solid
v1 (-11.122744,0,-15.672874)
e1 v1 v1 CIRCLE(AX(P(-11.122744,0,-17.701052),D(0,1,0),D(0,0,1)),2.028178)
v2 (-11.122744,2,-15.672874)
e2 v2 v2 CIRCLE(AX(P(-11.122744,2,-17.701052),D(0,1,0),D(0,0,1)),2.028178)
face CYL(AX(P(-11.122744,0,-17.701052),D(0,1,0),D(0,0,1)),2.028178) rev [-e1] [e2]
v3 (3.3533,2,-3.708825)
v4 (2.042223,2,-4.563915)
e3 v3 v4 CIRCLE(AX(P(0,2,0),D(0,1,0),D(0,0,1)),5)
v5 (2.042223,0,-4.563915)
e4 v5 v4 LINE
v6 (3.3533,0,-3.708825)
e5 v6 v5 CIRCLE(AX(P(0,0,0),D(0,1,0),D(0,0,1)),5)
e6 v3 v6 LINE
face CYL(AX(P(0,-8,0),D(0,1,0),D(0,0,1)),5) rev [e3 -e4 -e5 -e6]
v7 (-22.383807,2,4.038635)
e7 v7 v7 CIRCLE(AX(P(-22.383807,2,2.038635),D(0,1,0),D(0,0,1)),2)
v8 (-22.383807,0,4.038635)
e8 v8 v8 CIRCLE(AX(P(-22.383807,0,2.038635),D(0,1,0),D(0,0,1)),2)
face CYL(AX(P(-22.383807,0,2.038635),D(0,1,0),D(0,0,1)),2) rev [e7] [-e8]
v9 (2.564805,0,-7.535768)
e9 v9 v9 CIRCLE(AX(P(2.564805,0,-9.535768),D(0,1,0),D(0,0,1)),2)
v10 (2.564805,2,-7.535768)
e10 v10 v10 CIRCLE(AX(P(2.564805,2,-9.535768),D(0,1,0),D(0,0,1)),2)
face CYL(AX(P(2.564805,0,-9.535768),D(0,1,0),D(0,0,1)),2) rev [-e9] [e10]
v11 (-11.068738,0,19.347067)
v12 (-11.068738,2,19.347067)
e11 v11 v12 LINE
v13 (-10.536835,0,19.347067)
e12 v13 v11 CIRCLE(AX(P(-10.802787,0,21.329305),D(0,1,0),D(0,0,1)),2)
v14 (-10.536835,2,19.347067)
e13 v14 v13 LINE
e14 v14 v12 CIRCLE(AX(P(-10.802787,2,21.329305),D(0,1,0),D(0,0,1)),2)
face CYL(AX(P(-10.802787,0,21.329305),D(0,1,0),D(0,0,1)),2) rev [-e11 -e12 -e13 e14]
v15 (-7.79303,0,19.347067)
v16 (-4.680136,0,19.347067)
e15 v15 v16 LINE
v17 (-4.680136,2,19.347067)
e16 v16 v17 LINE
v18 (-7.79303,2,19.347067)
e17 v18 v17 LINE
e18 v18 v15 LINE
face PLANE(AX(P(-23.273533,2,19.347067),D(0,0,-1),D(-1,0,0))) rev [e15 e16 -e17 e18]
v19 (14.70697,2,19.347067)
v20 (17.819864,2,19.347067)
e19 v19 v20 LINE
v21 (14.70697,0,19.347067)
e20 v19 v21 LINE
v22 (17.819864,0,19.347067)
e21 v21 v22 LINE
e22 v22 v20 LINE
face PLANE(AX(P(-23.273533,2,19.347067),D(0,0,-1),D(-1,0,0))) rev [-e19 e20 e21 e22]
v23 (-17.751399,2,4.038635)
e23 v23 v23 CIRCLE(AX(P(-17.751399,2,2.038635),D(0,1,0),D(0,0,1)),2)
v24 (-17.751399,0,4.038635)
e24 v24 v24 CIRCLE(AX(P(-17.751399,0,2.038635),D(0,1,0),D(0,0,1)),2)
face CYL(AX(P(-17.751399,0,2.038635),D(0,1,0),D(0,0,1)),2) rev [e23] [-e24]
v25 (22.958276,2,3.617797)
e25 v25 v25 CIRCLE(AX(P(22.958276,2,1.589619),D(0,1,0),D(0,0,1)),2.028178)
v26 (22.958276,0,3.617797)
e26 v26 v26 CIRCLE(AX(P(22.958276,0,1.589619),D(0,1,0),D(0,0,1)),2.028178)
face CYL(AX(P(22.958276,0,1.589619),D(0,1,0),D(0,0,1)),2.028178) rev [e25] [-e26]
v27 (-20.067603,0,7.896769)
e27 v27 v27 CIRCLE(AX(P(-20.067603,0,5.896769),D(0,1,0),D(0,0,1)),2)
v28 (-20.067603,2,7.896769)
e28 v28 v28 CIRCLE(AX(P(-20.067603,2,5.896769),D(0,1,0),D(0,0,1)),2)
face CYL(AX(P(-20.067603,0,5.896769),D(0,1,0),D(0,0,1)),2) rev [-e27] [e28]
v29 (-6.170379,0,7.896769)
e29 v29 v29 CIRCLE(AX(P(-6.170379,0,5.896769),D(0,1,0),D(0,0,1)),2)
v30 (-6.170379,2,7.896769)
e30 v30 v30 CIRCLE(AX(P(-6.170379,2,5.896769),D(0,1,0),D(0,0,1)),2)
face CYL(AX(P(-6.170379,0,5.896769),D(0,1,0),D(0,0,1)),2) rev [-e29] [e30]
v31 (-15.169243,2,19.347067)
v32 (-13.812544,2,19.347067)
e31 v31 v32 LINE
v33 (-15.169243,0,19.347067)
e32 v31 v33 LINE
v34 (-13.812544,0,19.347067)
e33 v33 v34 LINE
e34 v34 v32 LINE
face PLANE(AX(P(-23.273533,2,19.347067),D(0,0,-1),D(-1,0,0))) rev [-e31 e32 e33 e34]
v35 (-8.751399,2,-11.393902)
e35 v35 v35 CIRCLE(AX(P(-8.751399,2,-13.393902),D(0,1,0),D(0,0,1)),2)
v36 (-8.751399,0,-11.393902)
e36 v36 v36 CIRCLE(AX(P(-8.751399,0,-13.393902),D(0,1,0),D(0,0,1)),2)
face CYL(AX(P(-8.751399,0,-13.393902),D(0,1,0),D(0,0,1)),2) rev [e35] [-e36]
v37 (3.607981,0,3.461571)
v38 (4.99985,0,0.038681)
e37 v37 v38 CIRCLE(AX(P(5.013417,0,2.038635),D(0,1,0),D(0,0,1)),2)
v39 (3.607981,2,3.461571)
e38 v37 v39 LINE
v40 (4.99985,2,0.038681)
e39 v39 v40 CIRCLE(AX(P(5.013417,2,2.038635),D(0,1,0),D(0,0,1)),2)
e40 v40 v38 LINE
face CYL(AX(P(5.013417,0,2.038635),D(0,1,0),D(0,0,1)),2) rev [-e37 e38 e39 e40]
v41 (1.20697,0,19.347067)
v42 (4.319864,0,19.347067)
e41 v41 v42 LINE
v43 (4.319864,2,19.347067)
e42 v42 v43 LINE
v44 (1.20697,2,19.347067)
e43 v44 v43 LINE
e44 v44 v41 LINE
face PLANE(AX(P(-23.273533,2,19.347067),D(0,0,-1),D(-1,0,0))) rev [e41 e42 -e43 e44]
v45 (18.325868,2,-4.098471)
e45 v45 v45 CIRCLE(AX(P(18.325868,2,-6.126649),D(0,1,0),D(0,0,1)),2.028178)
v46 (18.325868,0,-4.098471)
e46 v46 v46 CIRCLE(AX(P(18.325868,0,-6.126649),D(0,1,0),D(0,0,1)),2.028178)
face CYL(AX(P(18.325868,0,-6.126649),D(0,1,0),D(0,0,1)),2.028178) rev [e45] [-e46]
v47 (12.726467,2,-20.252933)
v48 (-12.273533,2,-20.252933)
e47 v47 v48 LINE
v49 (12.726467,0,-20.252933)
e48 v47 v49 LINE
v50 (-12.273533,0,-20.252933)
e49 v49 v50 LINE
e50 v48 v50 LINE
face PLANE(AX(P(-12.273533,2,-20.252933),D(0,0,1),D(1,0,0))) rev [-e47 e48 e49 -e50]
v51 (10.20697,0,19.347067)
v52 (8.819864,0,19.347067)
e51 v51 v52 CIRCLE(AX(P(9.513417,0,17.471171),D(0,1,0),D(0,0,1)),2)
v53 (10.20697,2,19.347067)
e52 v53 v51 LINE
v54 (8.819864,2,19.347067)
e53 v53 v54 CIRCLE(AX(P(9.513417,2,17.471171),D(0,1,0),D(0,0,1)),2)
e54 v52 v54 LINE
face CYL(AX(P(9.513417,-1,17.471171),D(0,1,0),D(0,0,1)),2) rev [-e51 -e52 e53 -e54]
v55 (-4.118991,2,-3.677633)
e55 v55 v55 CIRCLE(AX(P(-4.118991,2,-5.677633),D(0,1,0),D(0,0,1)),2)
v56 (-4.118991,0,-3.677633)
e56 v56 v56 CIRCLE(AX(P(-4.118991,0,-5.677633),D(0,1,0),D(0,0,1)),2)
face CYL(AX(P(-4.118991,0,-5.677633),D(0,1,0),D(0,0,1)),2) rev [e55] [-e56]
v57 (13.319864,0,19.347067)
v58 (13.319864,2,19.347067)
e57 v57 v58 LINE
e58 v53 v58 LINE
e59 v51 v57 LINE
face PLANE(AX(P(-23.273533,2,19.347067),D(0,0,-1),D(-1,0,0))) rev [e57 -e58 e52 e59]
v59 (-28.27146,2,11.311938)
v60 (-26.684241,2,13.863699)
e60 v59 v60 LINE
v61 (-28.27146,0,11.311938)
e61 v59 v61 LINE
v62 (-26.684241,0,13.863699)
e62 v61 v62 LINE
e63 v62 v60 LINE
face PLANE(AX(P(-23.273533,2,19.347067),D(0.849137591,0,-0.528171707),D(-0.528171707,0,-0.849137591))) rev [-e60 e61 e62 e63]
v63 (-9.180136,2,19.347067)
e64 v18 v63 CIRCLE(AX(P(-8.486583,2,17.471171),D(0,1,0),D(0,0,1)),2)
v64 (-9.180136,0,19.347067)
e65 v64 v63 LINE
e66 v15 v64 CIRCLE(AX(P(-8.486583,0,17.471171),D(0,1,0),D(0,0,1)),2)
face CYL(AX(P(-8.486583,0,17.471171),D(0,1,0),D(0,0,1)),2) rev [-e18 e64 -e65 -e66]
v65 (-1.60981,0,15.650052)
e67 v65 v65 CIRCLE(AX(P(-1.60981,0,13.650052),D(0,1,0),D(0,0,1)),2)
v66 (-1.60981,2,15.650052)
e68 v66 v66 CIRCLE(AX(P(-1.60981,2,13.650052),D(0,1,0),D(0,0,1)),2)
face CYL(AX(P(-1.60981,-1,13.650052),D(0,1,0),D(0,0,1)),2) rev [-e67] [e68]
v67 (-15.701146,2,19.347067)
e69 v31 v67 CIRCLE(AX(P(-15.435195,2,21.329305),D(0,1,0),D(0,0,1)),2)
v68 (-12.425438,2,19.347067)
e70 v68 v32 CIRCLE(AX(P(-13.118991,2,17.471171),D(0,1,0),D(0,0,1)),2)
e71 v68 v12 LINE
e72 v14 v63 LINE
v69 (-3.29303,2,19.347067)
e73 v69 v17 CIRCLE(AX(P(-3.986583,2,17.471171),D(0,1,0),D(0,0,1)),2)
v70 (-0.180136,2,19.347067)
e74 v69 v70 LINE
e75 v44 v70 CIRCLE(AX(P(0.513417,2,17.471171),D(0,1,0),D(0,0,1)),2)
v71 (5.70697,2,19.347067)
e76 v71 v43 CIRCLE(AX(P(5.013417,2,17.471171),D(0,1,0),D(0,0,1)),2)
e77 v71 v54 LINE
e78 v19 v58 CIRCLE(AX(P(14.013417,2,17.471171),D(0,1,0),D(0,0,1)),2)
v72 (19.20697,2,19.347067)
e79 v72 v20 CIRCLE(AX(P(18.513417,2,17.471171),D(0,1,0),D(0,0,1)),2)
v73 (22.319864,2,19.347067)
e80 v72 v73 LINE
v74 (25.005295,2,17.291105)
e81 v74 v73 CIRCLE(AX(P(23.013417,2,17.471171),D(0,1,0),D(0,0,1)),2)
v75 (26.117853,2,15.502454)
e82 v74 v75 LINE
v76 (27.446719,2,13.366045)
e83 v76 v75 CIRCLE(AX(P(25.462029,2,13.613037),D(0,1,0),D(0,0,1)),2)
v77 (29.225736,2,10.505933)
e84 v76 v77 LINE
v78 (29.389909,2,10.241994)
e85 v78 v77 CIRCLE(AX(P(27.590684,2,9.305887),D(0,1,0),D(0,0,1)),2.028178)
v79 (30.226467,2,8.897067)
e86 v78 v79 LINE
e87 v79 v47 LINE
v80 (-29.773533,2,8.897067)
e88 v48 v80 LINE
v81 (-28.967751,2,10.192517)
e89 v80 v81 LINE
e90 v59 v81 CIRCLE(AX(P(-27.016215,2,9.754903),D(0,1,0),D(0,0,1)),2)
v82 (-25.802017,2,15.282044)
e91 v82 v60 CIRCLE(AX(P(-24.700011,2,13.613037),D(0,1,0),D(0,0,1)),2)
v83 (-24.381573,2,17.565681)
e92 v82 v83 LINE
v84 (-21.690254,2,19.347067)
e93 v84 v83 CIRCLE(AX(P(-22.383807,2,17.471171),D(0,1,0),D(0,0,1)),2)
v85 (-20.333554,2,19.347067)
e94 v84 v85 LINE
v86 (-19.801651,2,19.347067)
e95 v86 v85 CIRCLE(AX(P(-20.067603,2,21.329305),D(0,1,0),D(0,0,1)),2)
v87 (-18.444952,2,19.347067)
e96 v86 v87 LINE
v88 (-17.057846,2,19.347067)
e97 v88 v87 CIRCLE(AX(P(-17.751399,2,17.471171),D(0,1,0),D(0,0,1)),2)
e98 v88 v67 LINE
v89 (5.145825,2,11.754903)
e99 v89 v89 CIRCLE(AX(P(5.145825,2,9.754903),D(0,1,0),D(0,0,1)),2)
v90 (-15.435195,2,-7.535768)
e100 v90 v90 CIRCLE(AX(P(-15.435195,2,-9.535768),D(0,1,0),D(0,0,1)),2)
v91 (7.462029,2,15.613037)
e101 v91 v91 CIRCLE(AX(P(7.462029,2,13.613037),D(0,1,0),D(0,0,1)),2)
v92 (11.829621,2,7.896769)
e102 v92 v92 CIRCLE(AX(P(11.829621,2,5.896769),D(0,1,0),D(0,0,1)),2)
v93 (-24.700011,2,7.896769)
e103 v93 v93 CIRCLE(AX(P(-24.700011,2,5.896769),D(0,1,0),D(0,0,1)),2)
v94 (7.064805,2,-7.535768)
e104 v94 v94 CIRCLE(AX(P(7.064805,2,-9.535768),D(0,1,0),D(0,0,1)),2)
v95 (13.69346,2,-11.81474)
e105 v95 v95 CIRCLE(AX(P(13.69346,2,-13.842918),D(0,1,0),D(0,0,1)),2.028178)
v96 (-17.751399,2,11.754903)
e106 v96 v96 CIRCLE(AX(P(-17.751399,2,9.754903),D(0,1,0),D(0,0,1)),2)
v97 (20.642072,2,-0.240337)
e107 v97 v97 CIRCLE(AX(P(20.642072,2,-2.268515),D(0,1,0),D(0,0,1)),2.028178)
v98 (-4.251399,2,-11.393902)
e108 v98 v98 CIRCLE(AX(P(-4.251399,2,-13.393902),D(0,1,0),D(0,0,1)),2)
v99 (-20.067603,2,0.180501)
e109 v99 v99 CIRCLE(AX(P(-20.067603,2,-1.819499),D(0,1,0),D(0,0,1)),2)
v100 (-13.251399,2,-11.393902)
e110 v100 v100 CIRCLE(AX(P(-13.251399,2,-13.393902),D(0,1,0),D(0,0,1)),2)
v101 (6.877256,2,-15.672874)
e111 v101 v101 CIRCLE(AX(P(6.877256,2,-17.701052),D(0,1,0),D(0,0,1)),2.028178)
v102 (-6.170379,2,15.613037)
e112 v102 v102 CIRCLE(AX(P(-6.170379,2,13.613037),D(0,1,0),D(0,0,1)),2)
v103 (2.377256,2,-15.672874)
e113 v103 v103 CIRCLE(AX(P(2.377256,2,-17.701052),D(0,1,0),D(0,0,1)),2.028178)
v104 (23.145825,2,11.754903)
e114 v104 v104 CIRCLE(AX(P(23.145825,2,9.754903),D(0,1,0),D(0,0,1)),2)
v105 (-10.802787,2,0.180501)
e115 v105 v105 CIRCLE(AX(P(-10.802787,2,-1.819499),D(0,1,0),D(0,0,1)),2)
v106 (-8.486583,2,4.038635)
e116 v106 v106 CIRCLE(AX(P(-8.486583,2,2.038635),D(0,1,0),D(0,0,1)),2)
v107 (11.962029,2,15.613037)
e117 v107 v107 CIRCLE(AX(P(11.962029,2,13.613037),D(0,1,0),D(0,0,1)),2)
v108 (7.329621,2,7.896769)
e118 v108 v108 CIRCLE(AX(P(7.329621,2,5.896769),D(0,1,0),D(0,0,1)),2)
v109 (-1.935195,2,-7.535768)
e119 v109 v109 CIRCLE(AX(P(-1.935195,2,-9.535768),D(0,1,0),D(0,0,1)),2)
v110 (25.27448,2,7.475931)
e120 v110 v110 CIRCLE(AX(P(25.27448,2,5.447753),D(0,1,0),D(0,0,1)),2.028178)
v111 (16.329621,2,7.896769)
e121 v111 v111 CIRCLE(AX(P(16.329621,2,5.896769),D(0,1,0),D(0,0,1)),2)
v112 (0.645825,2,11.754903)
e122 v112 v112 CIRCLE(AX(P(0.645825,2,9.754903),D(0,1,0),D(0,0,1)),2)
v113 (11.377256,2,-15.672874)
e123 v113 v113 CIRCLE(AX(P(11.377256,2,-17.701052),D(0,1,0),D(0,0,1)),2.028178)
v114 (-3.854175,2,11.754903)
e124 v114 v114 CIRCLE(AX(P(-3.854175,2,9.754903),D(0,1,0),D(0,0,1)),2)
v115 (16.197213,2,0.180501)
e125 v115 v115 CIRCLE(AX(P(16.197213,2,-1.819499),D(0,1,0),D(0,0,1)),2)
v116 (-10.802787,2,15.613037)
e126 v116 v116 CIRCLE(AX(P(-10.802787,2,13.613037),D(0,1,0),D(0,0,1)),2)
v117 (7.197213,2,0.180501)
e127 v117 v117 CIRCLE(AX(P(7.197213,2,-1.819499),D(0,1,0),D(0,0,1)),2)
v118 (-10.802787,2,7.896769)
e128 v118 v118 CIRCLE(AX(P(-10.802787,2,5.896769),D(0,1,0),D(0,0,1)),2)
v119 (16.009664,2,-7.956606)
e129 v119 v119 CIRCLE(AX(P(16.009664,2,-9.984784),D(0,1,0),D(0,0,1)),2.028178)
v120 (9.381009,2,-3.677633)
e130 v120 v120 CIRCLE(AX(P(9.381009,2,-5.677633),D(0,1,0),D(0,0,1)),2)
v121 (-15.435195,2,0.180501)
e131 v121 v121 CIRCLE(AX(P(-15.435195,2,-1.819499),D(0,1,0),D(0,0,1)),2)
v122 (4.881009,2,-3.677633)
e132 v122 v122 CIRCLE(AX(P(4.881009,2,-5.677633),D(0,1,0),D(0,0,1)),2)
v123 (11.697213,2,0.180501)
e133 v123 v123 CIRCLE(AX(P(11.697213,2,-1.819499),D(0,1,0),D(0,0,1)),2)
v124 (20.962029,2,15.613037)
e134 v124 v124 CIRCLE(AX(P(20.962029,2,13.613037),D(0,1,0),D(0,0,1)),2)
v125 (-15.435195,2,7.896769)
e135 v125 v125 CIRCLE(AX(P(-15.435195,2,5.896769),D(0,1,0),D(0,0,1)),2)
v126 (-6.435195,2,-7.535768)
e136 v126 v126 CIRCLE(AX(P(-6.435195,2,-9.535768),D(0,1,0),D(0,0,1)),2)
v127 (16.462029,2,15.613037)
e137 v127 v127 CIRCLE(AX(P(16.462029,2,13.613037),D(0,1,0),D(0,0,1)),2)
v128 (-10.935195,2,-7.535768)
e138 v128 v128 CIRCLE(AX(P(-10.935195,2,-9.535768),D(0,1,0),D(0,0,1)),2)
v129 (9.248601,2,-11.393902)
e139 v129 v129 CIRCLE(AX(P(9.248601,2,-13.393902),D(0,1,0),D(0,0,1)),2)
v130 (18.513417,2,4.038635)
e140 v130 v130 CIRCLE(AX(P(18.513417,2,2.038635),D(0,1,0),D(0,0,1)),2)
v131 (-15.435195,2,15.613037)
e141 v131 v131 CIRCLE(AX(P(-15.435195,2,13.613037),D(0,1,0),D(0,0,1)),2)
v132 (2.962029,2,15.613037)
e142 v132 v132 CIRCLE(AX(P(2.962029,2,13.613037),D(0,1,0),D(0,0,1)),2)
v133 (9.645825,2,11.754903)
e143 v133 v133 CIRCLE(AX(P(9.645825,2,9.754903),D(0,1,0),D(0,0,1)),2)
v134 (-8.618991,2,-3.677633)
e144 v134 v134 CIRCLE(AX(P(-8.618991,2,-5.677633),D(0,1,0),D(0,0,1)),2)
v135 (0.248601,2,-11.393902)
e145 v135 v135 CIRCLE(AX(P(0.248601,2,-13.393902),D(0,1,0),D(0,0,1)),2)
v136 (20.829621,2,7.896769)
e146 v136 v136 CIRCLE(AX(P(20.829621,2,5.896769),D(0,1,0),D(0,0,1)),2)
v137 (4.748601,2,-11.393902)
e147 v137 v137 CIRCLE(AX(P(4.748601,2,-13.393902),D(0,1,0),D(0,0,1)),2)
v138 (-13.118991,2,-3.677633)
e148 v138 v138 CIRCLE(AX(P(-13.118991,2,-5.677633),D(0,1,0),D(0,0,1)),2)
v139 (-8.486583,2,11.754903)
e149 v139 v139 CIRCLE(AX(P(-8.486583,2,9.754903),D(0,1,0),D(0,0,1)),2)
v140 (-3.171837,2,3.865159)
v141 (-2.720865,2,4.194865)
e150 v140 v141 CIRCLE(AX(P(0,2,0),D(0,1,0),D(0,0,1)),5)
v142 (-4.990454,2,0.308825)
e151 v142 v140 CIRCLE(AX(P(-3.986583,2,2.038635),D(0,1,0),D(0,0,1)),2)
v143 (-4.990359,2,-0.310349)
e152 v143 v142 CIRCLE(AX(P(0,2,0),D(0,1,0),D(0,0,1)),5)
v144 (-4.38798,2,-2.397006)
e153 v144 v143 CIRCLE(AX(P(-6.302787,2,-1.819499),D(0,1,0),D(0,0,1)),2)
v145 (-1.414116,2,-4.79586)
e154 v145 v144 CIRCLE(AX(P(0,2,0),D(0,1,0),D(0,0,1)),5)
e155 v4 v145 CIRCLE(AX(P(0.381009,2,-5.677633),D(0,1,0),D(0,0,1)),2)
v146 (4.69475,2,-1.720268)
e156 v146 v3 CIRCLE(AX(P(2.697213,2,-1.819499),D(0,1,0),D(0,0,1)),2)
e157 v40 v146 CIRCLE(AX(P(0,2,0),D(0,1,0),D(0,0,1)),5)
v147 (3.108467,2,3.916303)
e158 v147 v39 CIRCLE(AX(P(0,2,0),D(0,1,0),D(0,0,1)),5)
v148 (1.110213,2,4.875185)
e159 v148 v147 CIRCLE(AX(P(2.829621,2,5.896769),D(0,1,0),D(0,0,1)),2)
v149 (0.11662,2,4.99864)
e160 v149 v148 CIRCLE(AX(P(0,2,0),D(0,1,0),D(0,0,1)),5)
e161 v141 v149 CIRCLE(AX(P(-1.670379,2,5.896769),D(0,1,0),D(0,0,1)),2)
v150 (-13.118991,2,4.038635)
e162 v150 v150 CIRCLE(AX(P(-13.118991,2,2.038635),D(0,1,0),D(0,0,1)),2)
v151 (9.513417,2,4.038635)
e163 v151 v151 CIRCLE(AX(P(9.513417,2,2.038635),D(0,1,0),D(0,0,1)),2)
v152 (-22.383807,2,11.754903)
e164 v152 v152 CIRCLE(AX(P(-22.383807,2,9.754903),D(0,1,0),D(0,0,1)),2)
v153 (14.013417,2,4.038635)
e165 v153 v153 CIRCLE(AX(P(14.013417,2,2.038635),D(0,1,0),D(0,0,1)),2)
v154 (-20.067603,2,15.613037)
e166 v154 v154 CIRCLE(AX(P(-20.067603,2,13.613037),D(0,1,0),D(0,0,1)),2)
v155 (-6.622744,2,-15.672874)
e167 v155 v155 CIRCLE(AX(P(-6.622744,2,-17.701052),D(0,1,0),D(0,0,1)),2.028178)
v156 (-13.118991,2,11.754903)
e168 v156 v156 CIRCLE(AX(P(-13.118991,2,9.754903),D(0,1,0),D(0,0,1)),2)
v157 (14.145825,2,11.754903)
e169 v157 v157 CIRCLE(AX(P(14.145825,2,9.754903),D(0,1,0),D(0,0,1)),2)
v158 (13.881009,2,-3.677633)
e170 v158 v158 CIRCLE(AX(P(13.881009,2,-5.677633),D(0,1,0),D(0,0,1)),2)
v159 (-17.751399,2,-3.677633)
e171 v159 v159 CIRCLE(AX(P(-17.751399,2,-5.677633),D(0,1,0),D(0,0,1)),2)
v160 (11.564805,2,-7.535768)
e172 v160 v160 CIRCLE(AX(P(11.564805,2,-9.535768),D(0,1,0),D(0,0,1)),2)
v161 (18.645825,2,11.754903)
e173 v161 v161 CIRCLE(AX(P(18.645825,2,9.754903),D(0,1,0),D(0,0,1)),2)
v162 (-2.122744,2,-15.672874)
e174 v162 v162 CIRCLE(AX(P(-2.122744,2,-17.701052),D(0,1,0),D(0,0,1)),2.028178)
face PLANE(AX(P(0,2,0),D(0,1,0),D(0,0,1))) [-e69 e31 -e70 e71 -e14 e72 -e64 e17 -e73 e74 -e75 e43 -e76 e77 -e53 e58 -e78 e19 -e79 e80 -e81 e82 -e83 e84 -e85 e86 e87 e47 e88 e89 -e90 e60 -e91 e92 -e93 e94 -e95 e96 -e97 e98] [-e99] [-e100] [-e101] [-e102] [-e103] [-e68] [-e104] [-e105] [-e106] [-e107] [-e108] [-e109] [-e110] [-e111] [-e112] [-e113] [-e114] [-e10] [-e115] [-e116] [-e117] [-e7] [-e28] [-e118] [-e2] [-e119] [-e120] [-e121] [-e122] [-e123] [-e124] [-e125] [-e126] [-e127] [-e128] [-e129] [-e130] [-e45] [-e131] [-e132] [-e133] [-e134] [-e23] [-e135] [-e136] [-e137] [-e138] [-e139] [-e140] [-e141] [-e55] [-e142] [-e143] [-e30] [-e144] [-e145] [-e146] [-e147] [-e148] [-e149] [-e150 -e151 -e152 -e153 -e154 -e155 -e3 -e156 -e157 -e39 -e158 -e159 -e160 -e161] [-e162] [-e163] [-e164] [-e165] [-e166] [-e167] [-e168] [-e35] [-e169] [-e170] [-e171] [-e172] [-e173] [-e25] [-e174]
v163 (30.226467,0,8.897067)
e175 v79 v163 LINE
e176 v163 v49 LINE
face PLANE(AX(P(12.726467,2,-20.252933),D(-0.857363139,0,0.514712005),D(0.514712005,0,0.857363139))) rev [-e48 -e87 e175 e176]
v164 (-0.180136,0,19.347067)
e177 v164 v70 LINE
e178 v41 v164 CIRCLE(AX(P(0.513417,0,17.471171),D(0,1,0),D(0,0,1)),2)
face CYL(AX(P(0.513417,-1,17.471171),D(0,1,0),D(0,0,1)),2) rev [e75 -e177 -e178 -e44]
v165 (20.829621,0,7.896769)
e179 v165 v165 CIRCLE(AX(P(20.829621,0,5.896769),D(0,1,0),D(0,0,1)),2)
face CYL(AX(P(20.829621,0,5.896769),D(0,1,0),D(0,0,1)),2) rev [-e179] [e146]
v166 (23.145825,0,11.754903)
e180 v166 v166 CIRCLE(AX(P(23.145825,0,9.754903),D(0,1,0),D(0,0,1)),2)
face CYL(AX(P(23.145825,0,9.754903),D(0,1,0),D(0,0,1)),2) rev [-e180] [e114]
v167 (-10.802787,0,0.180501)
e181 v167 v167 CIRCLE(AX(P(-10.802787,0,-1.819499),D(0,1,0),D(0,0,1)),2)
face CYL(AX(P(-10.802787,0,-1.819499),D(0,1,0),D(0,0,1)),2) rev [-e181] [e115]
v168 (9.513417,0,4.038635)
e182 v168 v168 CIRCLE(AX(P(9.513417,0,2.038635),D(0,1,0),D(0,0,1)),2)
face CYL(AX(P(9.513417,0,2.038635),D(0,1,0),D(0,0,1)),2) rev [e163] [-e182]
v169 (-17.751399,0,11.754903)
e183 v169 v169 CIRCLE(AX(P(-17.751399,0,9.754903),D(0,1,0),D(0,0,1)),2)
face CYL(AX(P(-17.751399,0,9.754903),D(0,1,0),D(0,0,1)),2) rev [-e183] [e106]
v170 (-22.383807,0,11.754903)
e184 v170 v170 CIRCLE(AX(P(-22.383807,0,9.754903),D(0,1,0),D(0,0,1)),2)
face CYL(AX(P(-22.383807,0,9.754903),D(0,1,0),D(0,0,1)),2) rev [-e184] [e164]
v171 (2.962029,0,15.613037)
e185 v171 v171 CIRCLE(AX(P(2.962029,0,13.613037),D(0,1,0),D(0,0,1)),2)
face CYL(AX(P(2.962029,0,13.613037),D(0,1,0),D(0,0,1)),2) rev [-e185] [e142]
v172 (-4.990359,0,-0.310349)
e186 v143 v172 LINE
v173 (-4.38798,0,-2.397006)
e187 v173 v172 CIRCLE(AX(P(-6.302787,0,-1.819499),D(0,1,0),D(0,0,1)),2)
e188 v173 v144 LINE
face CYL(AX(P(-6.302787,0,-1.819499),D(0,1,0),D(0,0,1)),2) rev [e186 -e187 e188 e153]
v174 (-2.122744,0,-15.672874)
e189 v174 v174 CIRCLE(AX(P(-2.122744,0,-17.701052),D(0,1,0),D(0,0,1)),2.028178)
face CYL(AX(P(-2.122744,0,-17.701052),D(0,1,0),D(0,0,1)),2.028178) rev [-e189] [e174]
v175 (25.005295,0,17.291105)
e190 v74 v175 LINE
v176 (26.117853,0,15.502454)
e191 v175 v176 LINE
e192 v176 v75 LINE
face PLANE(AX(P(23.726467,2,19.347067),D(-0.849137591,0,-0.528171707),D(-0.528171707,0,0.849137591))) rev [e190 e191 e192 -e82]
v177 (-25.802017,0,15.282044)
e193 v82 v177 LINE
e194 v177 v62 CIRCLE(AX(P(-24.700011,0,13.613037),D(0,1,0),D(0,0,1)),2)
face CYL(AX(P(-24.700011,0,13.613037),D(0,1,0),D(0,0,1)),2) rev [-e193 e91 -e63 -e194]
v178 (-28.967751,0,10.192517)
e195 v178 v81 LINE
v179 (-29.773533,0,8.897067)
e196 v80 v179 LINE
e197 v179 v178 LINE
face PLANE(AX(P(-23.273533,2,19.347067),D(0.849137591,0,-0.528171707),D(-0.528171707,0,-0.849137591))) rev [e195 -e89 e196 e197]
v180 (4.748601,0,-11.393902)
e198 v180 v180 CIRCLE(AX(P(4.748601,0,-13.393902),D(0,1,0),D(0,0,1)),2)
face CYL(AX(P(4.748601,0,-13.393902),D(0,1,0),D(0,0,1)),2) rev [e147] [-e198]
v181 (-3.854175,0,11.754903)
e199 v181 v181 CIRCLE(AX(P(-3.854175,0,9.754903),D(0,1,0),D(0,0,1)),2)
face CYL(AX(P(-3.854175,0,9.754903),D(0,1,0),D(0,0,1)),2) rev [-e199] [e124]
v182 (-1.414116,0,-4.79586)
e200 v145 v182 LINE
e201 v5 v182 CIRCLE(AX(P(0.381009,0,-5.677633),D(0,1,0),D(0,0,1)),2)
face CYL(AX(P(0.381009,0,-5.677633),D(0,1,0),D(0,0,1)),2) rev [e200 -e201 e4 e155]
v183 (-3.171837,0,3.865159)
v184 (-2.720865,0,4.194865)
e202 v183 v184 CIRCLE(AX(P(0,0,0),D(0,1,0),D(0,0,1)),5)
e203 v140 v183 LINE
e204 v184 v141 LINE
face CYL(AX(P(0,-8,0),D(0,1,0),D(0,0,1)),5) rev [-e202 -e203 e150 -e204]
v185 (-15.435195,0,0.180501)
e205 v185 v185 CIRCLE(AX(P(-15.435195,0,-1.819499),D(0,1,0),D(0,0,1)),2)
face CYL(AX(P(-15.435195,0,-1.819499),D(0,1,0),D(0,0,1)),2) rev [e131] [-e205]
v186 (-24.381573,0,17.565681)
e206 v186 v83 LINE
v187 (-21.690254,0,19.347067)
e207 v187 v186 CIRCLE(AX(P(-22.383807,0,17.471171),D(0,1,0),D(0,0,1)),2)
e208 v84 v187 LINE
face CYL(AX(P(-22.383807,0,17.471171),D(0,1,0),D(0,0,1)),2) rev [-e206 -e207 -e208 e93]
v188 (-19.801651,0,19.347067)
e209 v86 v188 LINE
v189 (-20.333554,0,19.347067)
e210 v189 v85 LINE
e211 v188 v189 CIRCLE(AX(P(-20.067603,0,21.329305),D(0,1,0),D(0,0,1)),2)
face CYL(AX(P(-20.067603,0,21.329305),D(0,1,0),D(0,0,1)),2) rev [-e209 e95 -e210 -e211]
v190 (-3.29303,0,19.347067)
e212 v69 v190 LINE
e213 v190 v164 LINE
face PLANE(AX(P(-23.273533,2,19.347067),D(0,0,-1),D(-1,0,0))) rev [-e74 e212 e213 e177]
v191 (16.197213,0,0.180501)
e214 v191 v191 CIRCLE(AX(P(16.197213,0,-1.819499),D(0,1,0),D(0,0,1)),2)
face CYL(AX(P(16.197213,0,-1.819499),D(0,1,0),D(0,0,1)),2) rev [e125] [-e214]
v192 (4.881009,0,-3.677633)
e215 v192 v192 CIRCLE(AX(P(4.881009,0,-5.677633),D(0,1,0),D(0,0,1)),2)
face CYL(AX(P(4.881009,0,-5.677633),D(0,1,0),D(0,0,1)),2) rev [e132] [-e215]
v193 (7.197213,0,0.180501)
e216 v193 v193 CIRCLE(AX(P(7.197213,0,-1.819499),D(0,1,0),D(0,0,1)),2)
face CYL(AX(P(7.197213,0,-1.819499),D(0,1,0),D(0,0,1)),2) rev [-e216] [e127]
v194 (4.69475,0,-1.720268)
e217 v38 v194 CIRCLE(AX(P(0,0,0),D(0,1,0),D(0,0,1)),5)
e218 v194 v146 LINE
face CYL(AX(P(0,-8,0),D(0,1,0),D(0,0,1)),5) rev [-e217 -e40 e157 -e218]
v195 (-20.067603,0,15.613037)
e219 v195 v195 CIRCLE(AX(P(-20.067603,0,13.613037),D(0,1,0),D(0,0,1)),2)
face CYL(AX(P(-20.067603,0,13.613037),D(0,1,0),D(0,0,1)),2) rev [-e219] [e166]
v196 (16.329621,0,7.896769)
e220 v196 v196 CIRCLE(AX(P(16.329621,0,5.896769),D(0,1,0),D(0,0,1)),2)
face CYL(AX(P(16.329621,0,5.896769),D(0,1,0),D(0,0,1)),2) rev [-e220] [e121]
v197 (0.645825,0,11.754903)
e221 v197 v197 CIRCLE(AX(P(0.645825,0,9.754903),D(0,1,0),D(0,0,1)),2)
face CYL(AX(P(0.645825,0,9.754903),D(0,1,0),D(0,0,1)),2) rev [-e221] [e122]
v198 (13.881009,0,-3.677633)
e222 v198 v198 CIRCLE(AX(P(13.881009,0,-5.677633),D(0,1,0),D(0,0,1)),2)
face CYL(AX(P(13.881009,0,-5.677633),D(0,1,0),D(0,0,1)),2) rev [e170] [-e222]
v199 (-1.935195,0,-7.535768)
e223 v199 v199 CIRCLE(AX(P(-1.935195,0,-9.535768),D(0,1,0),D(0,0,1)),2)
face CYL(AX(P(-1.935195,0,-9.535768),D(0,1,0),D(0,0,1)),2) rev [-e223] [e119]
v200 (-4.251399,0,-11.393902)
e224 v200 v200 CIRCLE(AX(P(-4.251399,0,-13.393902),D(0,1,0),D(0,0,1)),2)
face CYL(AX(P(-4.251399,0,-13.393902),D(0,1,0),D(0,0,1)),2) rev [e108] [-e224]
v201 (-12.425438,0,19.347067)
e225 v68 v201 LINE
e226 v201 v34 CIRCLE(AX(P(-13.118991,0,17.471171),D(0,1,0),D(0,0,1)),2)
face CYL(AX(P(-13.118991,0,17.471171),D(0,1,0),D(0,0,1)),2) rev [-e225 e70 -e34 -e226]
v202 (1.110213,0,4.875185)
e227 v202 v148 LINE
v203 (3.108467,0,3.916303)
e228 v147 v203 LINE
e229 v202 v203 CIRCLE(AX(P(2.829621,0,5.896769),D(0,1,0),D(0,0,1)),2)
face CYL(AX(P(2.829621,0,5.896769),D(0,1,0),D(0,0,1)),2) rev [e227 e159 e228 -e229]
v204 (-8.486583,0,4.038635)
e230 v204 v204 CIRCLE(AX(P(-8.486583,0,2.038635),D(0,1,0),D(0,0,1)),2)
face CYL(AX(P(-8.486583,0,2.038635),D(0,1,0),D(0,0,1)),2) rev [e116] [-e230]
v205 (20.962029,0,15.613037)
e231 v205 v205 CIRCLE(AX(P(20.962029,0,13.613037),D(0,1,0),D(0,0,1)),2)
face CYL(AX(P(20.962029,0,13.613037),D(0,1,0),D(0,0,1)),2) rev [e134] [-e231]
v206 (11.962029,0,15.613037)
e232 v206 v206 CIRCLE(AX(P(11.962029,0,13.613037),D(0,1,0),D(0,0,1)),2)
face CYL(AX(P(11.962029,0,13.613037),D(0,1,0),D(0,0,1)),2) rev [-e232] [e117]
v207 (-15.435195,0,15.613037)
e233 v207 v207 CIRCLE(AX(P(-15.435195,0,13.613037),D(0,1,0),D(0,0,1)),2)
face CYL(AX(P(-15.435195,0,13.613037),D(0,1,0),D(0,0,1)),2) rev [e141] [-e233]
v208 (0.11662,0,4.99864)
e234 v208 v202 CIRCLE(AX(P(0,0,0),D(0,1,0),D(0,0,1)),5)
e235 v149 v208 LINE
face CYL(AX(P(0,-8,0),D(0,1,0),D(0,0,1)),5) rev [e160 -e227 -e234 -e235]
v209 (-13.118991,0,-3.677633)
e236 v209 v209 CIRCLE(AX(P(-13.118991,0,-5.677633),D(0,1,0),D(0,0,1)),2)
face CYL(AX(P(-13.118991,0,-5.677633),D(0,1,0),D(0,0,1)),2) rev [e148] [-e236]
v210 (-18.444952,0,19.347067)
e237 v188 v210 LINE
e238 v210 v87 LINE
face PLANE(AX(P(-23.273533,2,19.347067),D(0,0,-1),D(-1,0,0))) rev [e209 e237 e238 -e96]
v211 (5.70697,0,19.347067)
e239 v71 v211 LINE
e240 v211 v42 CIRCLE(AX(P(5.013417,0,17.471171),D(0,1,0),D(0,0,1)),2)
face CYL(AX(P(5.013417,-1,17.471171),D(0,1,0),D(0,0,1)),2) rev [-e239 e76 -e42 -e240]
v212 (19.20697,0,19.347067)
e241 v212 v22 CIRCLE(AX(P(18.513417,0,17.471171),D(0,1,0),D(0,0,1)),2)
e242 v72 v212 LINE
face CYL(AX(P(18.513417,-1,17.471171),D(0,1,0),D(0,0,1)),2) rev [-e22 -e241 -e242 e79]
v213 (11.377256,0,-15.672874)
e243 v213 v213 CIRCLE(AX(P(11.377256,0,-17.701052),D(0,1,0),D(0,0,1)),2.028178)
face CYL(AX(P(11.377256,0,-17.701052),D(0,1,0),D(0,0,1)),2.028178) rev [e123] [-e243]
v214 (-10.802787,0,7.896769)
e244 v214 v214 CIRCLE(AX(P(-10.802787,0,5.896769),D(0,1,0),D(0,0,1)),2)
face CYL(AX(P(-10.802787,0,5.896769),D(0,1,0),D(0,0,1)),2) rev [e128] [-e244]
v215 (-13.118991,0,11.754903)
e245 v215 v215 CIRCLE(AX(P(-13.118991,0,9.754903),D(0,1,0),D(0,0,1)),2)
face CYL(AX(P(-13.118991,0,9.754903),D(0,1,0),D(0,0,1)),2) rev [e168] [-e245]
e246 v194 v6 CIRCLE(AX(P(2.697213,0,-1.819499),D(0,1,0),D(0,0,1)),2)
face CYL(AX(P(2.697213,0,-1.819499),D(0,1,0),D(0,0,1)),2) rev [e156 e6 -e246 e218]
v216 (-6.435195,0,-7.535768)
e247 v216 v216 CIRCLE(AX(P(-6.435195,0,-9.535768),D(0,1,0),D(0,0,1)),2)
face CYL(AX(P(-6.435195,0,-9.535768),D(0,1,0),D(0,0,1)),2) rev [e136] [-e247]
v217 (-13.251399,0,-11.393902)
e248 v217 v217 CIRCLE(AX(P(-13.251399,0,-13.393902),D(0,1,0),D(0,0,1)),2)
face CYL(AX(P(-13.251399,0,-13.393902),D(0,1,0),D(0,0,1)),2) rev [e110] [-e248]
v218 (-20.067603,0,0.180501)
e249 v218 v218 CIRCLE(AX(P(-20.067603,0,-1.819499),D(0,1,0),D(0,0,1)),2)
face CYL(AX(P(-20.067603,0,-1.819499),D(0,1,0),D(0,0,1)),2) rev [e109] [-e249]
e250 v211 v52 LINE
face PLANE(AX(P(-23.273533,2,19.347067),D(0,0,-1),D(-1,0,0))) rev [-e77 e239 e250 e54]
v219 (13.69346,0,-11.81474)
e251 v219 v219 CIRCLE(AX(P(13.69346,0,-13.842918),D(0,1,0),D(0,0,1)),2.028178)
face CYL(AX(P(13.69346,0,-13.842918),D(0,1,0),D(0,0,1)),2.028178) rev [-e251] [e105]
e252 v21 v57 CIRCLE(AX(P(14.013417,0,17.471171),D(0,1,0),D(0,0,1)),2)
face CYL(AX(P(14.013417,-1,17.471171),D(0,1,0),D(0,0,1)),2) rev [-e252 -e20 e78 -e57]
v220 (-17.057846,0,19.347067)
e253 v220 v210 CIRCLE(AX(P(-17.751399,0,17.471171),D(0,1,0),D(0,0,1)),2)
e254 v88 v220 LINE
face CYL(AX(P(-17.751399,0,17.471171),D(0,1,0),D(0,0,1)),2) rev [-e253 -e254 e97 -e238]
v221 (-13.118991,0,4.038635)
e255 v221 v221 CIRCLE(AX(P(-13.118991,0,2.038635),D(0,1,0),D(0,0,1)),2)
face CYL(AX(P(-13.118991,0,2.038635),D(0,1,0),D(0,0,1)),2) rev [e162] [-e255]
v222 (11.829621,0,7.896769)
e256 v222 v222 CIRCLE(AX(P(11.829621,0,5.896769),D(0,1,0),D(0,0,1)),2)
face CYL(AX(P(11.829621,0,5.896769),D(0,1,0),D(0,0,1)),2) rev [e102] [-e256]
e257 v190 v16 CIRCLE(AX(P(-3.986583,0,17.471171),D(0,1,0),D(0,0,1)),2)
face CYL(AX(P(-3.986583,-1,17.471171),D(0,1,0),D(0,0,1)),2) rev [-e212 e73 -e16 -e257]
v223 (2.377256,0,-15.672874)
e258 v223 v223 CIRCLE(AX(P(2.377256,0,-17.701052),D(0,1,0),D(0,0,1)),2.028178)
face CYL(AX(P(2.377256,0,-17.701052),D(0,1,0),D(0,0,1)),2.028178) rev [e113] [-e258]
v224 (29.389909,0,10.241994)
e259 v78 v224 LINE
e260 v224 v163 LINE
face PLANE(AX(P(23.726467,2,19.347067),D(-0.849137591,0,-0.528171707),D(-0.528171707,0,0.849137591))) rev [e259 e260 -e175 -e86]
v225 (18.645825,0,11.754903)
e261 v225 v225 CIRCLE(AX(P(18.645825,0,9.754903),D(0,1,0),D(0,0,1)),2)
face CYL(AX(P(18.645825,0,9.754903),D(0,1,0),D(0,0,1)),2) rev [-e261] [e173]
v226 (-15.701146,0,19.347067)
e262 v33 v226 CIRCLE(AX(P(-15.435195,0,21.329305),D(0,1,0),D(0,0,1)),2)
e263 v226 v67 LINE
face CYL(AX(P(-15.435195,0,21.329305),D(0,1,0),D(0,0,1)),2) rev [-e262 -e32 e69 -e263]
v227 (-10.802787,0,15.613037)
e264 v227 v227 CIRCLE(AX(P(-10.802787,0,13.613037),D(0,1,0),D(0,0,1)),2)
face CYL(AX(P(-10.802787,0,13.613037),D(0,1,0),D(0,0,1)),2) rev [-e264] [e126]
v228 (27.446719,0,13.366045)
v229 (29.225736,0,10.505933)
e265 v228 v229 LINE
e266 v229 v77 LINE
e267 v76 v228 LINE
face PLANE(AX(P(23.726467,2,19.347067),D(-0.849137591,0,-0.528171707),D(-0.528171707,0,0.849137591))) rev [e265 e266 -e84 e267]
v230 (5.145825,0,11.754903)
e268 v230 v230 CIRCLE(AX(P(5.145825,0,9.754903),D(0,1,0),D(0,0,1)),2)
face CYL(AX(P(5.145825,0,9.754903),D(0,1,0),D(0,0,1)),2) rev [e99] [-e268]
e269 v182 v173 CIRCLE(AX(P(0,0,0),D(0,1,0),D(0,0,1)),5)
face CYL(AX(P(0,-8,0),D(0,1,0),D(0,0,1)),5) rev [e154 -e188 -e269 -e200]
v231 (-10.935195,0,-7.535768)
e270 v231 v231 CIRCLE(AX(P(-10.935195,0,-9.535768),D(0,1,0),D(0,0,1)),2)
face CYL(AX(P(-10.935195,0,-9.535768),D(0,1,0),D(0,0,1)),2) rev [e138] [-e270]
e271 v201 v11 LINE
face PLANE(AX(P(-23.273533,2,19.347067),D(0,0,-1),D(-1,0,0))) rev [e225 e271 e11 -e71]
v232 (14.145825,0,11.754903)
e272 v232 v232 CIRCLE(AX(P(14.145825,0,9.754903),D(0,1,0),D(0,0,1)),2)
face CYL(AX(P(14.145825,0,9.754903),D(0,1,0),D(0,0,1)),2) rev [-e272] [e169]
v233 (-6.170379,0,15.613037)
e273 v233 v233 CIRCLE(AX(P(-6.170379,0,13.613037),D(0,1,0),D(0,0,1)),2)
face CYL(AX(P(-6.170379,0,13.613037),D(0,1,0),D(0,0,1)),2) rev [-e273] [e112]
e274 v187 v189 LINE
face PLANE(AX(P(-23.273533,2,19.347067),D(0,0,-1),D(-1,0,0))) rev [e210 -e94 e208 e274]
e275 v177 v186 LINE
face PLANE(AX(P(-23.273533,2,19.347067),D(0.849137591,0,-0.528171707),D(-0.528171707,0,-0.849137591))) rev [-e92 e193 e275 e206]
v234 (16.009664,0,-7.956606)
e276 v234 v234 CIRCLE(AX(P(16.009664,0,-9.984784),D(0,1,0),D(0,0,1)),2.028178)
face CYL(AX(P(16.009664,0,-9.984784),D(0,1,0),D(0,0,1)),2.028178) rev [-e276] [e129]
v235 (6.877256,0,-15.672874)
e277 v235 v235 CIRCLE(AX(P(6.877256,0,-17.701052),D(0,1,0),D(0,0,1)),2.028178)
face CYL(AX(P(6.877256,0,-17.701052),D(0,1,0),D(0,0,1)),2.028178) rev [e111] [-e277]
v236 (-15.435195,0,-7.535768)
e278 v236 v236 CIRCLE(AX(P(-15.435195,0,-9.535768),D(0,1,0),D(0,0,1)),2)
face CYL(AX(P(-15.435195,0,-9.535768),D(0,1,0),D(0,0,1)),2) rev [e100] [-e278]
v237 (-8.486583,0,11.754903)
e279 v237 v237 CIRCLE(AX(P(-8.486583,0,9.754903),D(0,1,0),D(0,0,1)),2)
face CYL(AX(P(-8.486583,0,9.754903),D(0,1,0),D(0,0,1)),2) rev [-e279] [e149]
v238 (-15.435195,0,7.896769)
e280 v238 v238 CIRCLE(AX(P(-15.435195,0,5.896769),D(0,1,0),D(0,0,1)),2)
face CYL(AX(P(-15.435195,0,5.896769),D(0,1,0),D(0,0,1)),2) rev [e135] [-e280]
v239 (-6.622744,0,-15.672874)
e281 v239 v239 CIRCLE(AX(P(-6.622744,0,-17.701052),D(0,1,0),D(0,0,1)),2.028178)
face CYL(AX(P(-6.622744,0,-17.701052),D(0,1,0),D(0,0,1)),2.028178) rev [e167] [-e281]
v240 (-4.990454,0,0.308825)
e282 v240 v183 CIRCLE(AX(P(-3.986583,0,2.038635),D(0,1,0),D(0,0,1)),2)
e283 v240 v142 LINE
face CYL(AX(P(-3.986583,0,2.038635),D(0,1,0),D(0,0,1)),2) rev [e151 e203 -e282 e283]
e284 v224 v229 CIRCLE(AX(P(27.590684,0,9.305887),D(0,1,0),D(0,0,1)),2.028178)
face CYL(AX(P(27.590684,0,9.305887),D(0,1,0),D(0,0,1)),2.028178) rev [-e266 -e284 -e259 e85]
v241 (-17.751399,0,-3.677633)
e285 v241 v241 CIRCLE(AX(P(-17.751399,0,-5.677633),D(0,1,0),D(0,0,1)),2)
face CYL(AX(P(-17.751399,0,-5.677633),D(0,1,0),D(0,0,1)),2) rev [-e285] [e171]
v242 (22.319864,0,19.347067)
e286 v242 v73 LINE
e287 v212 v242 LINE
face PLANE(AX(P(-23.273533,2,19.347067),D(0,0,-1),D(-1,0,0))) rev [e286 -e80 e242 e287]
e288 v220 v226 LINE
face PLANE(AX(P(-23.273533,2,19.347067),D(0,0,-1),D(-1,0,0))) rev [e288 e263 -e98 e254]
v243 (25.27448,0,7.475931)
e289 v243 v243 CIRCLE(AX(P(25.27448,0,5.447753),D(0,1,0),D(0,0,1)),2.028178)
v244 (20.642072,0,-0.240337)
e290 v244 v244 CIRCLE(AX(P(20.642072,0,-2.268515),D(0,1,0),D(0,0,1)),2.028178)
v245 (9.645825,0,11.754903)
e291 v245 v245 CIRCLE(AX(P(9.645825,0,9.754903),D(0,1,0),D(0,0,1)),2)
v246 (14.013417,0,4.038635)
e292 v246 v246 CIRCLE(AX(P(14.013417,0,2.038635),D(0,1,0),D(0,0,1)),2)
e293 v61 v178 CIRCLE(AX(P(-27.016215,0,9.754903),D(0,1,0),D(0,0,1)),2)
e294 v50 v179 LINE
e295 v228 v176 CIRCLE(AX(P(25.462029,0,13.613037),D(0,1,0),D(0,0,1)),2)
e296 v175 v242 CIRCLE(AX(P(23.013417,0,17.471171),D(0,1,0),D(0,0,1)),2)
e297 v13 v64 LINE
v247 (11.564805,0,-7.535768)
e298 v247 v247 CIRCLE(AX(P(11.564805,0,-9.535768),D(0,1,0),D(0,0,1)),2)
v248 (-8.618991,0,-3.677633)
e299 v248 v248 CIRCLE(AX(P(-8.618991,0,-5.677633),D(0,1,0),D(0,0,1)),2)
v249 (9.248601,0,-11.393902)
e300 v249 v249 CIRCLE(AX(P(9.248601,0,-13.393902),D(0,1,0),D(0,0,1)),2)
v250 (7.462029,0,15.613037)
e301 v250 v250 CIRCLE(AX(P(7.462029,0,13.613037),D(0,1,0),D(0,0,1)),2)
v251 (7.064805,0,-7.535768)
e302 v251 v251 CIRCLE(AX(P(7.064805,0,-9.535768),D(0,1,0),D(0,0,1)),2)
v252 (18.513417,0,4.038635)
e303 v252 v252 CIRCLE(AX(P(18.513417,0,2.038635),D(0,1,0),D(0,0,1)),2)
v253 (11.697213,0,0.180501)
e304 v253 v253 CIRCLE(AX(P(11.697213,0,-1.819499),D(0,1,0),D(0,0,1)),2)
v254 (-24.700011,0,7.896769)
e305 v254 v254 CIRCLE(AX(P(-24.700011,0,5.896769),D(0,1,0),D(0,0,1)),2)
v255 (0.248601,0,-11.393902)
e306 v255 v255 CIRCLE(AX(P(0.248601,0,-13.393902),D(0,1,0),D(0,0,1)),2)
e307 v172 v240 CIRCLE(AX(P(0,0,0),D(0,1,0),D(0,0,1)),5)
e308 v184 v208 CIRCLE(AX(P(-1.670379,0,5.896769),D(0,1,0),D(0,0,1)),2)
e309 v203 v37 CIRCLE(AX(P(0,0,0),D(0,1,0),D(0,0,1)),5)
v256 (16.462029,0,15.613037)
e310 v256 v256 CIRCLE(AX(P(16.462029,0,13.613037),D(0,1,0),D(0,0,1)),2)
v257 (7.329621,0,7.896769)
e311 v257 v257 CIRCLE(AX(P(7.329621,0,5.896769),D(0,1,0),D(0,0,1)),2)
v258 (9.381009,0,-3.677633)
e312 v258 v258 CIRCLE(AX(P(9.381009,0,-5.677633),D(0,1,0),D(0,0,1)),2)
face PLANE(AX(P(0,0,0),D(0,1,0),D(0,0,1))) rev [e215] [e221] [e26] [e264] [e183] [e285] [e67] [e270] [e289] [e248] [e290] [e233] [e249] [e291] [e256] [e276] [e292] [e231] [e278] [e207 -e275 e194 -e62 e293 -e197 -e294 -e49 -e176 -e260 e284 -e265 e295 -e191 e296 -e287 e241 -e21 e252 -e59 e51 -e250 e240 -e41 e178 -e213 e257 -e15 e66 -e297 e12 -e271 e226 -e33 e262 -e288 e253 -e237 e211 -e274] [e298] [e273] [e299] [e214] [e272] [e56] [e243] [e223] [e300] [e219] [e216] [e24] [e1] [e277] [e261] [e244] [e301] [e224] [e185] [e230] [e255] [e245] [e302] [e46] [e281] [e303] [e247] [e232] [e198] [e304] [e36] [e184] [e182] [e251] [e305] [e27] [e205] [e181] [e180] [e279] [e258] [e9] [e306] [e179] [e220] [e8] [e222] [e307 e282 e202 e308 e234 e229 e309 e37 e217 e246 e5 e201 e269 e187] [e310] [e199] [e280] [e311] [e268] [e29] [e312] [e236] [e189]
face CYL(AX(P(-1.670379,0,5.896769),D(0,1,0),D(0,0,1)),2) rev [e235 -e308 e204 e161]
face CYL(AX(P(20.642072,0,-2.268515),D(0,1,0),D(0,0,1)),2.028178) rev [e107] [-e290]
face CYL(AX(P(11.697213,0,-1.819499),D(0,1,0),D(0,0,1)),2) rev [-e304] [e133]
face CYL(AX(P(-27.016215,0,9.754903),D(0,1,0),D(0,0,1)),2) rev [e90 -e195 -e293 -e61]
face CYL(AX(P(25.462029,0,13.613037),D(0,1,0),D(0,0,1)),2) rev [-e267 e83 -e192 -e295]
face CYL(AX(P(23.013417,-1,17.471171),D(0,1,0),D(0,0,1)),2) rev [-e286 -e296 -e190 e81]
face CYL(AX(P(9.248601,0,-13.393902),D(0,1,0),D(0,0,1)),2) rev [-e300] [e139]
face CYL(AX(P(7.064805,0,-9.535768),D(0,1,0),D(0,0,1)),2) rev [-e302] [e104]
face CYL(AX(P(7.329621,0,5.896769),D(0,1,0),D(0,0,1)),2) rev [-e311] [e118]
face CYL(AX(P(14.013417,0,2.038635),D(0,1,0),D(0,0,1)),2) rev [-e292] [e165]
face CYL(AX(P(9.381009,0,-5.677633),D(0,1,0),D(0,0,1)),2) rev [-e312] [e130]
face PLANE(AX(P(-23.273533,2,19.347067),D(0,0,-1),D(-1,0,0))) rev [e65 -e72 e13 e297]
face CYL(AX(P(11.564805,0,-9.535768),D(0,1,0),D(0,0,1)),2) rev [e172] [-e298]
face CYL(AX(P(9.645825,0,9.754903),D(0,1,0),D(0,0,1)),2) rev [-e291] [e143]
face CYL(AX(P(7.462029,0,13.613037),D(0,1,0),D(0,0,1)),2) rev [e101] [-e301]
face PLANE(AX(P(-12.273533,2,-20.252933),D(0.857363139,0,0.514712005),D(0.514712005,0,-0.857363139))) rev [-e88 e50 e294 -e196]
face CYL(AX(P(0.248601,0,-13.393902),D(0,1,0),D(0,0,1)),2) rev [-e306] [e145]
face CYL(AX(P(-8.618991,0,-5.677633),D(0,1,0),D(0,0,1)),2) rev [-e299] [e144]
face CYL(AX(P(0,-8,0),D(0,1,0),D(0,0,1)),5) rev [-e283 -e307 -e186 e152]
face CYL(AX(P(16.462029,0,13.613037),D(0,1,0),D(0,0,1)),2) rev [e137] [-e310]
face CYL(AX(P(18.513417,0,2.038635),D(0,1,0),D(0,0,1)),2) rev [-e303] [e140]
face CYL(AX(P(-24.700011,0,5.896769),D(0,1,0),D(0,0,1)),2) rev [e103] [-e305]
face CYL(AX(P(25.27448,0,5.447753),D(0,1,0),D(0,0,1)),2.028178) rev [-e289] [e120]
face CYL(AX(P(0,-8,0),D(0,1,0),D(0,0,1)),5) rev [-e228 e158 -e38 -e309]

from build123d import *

# Parameters (mm, degrees)
BOSS_EXTRUDE1_DEPTH  = 2
SKETCH2_R            = 2.028178019
CUT_EXTRUDE1_DEPTH   = 2
LPATTERN1_COUNT      = 6
LPATTERN1_PITCH      = 4.5
LPATTERN2_COUNT      = 8
LPATTERN2_PITCH      = 4.5
SKETCH4_R            = 2
CUT_EXTRUDE3_DEPTH   = 2
LPATTERN4_COUNT      = 8
LPATTERN4_PITCH      = 4.5
LPATTERN4_COUNT_DIR2 = 6
LPATTERN4_PITCH_DIR2 = 4.5
SKETCH5_R            = 2
CUT_EXTRUDE4_DEPTH   = 2
LPATTERN5_COUNT      = 6
LPATTERN5_PITCH      = 4.5
LPATTERN5_COUNT_DIR2 = 6
LPATTERN5_PITCH_DIR2 = 4.5
SKETCH6_W            = 0.774823081
SKETCH6_H            = 1.866619241
CUT_EXTRUDE5_DEPTH   = 3
SKETCH7_R            = 2
CUT_EXTRUDE6_DEPTH   = 3
LPATTERN6_DEPTH      = 2
LPATTERN7_COUNT      = 2
LPATTERN7_PITCH      = 4.5
SKETCH8_R            = 5
CUT_EXTRUDE7_DEPTH   = 10


# Read off the part's stored shape, not the designer's step: LPattern6
with BuildPart() as part:
    # Sketch1 → Boss-Extrude1 (new body)
    with BuildSketch(Plane(origin=(0, 0, 0), x_dir=(1, 0, 0), z_dir=(0, 1, 0))):
        Polygon((-12.273533446, 20.252933108), (12.726466554, 20.252933108), (30.226466554, -8.897066892), (23.726466554, -19.347066892), (-23.273533446, -19.347066892), (-29.773533446, -8.897066892), align=None)
    extrude(amount=BOSS_EXTRUDE1_DEPTH)

    # Sketch2 → Cut-Extrude1 (cut)
    with BuildSketch(Plane(origin=(0, 2, 0), x_dir=(1, 0, 0), z_dir=(0, 1, 0))):
        with Locations(Location((11.377256113, 17.701051842, 0), (0, 0, 270))):
            Circle(SKETCH2_R)
    cut_extrude1 = extrude(amount=-CUT_EXTRUDE1_DEPTH, mode=Mode.SUBTRACT)

    # LPattern1: Cut-Extrude1 ×6
    with Locations(*[(-i * LPATTERN1_PITCH, 0, 0) for i in range(1, LPATTERN1_COUNT)]):
        add(cut_extrude1, mode=Mode.SUBTRACT)

    # LPattern2: Cut-Extrude1 ×8
    with Locations(*[Vector(0.5147120046125901, 0, 0.8573631391118288) * (i * LPATTERN2_PITCH) for i in range(1, LPATTERN2_COUNT)]):
        add(cut_extrude1, mode=Mode.SUBTRACT)

    # Sketch4 → Cut-Extrude3 (cut)
    with BuildSketch(Plane(origin=(0, 2, 0), x_dir=(1, 0, 0), z_dir=(0, 1, 0))):
        with Locations(Location((9.248601258, 13.393901657, 0), (0, 0, 270))):
            Circle(SKETCH4_R)
    cut_extrude3 = extrude(amount=-CUT_EXTRUDE3_DEPTH, mode=Mode.SUBTRACT)

    # LPattern4: Cut-Extrude3 8 × 6
    with Locations(*[Vector(0.5147120046125901, 0, 0.8573631391118288) * (i * LPATTERN4_PITCH) + Vector(-1, 0, 0) * (j * LPATTERN4_PITCH_DIR2) for i in range(LPATTERN4_COUNT) for j in range(LPATTERN4_COUNT_DIR2) if (i, j) != (0, 0)]):
        add(cut_extrude3, mode=Mode.SUBTRACT)

    # Sketch5 → Cut-Extrude4 (cut)
    with BuildSketch(Plane(origin=(0, 2, 0), x_dir=(1, 0, 0), z_dir=(0, 1, 0))):
        with Locations(Location((-15.435194721, 9.535767531, 0), (0, 0, 270))):
            Circle(SKETCH5_R)
    cut_extrude4 = extrude(amount=-CUT_EXTRUDE4_DEPTH, mode=Mode.SUBTRACT)

    # LPattern5: Cut-Extrude4 6 × 6
    with Locations(*[Vector(-0.5147120046125901, 0, 0.8573631391118288) * (i * LPATTERN5_PITCH) + Vector(0.5147120046125901, 0, 0.8573631391118288) * (j * LPATTERN5_PITCH_DIR2) for i in range(LPATTERN5_COUNT) for j in range(LPATTERN5_COUNT_DIR2) if (i, j) != (0, 0)]):
        add(cut_extrude4, mode=Mode.SUBTRACT)

    # Sketch6 → Cut-Extrude5 (cut)
    with BuildSketch(Plane(origin=(0, 2, 0), x_dir=(1, 0, 0), z_dir=(0, 1, 0))):
        with Locations((-23.405230337, -19.594174878)):
            Rectangle(SKETCH6_W, SKETCH6_H)
    extrude(amount=-CUT_EXTRUDE5_DEPTH, mode=Mode.SUBTRACT)

    # Sketch7 → Cut-Extrude6 (cut)
    with BuildSketch(Plane(origin=(0, 2, 0), x_dir=(1, 0, 0), z_dir=(0, 1, 0))):
        with Locations((-3.986582659, -17.471171351)):
            Circle(SKETCH7_R)
    cut_extrude6 = extrude(amount=-CUT_EXTRUDE6_DEPTH, mode=Mode.SUBTRACT)

    # LPattern6 outline → LPattern6 (cut)
    with BuildSketch(Plane(origin=(0, 0, 0), x_dir=(1, 0, 0), z_dir=(0, 1, 0))):
        with BuildLine():
            Line((-0.180135771, -19.347066892), (1.206970453, -19.347066892))
            ThreePointArc((1.206970453, -19.347066892), (0.513417341, -15.471171351), (-0.180135771, -19.347066892))
        make_face()
        with BuildLine():
            ThreePointArc((25.00529483, -17.291104509), (21.79762259, -15.883140142), (22.319864229, -19.347066892))
            Line((22.319864229, -19.347066892), (23.726466554, -19.347066892))
            Line((23.726466554, -19.347066892), (25.00529483, -17.291104509))
        make_face()
        with BuildLine():
            ThreePointArc((19.206970453, -19.347066892), (18.513417341, -15.471171351), (17.819864229, -19.347066892))
            Line((17.819864229, -19.347066892), (19.206970453, -19.347066892))
        make_face()
        with BuildLine():
            ThreePointArc((14.706970453, -19.347066892), (14.013417341, -15.471171351), (13.319864229, -19.347066892))
            Line((13.319864229, -19.347066892), (14.706970453, -19.347066892))
        make_face()
        with BuildLine():
            ThreePointArc((10.206970453, -19.347066892), (9.513417341, -15.471171351), (8.819864229, -19.347066892))
            Line((8.819864229, -19.347066892), (10.206970453, -19.347066892))
        make_face()
        with BuildLine():
            ThreePointArc((5.706970453, -19.347066892), (5.013417341, -15.471171351), (4.319864229, -19.347066892))
            Line((4.319864229, -19.347066892), (5.706970453, -19.347066892))
        make_face()
    extrude(amount=LPATTERN6_DEPTH, mode=Mode.SUBTRACT)

    # LPattern7: Cut-Extrude6 ×2
    with Locations(*[Vector(0.5281717070926116, 0, -0.8491375906335066) * (i * LPATTERN7_PITCH) for i in range(1, LPATTERN7_COUNT)]):
        add(cut_extrude6, mode=Mode.SUBTRACT)

    # Sketch8 → Cut-Extrude7 (cut)
    with BuildSketch(Plane(origin=(0, 2, 0), x_dir=(1, 0, 0), z_dir=(0, 1, 0))):
        Circle(SKETCH8_R)
    extrude(amount=-CUT_EXTRUDE7_DEPTH, mode=Mode.SUBTRACT)


solid = part.part
